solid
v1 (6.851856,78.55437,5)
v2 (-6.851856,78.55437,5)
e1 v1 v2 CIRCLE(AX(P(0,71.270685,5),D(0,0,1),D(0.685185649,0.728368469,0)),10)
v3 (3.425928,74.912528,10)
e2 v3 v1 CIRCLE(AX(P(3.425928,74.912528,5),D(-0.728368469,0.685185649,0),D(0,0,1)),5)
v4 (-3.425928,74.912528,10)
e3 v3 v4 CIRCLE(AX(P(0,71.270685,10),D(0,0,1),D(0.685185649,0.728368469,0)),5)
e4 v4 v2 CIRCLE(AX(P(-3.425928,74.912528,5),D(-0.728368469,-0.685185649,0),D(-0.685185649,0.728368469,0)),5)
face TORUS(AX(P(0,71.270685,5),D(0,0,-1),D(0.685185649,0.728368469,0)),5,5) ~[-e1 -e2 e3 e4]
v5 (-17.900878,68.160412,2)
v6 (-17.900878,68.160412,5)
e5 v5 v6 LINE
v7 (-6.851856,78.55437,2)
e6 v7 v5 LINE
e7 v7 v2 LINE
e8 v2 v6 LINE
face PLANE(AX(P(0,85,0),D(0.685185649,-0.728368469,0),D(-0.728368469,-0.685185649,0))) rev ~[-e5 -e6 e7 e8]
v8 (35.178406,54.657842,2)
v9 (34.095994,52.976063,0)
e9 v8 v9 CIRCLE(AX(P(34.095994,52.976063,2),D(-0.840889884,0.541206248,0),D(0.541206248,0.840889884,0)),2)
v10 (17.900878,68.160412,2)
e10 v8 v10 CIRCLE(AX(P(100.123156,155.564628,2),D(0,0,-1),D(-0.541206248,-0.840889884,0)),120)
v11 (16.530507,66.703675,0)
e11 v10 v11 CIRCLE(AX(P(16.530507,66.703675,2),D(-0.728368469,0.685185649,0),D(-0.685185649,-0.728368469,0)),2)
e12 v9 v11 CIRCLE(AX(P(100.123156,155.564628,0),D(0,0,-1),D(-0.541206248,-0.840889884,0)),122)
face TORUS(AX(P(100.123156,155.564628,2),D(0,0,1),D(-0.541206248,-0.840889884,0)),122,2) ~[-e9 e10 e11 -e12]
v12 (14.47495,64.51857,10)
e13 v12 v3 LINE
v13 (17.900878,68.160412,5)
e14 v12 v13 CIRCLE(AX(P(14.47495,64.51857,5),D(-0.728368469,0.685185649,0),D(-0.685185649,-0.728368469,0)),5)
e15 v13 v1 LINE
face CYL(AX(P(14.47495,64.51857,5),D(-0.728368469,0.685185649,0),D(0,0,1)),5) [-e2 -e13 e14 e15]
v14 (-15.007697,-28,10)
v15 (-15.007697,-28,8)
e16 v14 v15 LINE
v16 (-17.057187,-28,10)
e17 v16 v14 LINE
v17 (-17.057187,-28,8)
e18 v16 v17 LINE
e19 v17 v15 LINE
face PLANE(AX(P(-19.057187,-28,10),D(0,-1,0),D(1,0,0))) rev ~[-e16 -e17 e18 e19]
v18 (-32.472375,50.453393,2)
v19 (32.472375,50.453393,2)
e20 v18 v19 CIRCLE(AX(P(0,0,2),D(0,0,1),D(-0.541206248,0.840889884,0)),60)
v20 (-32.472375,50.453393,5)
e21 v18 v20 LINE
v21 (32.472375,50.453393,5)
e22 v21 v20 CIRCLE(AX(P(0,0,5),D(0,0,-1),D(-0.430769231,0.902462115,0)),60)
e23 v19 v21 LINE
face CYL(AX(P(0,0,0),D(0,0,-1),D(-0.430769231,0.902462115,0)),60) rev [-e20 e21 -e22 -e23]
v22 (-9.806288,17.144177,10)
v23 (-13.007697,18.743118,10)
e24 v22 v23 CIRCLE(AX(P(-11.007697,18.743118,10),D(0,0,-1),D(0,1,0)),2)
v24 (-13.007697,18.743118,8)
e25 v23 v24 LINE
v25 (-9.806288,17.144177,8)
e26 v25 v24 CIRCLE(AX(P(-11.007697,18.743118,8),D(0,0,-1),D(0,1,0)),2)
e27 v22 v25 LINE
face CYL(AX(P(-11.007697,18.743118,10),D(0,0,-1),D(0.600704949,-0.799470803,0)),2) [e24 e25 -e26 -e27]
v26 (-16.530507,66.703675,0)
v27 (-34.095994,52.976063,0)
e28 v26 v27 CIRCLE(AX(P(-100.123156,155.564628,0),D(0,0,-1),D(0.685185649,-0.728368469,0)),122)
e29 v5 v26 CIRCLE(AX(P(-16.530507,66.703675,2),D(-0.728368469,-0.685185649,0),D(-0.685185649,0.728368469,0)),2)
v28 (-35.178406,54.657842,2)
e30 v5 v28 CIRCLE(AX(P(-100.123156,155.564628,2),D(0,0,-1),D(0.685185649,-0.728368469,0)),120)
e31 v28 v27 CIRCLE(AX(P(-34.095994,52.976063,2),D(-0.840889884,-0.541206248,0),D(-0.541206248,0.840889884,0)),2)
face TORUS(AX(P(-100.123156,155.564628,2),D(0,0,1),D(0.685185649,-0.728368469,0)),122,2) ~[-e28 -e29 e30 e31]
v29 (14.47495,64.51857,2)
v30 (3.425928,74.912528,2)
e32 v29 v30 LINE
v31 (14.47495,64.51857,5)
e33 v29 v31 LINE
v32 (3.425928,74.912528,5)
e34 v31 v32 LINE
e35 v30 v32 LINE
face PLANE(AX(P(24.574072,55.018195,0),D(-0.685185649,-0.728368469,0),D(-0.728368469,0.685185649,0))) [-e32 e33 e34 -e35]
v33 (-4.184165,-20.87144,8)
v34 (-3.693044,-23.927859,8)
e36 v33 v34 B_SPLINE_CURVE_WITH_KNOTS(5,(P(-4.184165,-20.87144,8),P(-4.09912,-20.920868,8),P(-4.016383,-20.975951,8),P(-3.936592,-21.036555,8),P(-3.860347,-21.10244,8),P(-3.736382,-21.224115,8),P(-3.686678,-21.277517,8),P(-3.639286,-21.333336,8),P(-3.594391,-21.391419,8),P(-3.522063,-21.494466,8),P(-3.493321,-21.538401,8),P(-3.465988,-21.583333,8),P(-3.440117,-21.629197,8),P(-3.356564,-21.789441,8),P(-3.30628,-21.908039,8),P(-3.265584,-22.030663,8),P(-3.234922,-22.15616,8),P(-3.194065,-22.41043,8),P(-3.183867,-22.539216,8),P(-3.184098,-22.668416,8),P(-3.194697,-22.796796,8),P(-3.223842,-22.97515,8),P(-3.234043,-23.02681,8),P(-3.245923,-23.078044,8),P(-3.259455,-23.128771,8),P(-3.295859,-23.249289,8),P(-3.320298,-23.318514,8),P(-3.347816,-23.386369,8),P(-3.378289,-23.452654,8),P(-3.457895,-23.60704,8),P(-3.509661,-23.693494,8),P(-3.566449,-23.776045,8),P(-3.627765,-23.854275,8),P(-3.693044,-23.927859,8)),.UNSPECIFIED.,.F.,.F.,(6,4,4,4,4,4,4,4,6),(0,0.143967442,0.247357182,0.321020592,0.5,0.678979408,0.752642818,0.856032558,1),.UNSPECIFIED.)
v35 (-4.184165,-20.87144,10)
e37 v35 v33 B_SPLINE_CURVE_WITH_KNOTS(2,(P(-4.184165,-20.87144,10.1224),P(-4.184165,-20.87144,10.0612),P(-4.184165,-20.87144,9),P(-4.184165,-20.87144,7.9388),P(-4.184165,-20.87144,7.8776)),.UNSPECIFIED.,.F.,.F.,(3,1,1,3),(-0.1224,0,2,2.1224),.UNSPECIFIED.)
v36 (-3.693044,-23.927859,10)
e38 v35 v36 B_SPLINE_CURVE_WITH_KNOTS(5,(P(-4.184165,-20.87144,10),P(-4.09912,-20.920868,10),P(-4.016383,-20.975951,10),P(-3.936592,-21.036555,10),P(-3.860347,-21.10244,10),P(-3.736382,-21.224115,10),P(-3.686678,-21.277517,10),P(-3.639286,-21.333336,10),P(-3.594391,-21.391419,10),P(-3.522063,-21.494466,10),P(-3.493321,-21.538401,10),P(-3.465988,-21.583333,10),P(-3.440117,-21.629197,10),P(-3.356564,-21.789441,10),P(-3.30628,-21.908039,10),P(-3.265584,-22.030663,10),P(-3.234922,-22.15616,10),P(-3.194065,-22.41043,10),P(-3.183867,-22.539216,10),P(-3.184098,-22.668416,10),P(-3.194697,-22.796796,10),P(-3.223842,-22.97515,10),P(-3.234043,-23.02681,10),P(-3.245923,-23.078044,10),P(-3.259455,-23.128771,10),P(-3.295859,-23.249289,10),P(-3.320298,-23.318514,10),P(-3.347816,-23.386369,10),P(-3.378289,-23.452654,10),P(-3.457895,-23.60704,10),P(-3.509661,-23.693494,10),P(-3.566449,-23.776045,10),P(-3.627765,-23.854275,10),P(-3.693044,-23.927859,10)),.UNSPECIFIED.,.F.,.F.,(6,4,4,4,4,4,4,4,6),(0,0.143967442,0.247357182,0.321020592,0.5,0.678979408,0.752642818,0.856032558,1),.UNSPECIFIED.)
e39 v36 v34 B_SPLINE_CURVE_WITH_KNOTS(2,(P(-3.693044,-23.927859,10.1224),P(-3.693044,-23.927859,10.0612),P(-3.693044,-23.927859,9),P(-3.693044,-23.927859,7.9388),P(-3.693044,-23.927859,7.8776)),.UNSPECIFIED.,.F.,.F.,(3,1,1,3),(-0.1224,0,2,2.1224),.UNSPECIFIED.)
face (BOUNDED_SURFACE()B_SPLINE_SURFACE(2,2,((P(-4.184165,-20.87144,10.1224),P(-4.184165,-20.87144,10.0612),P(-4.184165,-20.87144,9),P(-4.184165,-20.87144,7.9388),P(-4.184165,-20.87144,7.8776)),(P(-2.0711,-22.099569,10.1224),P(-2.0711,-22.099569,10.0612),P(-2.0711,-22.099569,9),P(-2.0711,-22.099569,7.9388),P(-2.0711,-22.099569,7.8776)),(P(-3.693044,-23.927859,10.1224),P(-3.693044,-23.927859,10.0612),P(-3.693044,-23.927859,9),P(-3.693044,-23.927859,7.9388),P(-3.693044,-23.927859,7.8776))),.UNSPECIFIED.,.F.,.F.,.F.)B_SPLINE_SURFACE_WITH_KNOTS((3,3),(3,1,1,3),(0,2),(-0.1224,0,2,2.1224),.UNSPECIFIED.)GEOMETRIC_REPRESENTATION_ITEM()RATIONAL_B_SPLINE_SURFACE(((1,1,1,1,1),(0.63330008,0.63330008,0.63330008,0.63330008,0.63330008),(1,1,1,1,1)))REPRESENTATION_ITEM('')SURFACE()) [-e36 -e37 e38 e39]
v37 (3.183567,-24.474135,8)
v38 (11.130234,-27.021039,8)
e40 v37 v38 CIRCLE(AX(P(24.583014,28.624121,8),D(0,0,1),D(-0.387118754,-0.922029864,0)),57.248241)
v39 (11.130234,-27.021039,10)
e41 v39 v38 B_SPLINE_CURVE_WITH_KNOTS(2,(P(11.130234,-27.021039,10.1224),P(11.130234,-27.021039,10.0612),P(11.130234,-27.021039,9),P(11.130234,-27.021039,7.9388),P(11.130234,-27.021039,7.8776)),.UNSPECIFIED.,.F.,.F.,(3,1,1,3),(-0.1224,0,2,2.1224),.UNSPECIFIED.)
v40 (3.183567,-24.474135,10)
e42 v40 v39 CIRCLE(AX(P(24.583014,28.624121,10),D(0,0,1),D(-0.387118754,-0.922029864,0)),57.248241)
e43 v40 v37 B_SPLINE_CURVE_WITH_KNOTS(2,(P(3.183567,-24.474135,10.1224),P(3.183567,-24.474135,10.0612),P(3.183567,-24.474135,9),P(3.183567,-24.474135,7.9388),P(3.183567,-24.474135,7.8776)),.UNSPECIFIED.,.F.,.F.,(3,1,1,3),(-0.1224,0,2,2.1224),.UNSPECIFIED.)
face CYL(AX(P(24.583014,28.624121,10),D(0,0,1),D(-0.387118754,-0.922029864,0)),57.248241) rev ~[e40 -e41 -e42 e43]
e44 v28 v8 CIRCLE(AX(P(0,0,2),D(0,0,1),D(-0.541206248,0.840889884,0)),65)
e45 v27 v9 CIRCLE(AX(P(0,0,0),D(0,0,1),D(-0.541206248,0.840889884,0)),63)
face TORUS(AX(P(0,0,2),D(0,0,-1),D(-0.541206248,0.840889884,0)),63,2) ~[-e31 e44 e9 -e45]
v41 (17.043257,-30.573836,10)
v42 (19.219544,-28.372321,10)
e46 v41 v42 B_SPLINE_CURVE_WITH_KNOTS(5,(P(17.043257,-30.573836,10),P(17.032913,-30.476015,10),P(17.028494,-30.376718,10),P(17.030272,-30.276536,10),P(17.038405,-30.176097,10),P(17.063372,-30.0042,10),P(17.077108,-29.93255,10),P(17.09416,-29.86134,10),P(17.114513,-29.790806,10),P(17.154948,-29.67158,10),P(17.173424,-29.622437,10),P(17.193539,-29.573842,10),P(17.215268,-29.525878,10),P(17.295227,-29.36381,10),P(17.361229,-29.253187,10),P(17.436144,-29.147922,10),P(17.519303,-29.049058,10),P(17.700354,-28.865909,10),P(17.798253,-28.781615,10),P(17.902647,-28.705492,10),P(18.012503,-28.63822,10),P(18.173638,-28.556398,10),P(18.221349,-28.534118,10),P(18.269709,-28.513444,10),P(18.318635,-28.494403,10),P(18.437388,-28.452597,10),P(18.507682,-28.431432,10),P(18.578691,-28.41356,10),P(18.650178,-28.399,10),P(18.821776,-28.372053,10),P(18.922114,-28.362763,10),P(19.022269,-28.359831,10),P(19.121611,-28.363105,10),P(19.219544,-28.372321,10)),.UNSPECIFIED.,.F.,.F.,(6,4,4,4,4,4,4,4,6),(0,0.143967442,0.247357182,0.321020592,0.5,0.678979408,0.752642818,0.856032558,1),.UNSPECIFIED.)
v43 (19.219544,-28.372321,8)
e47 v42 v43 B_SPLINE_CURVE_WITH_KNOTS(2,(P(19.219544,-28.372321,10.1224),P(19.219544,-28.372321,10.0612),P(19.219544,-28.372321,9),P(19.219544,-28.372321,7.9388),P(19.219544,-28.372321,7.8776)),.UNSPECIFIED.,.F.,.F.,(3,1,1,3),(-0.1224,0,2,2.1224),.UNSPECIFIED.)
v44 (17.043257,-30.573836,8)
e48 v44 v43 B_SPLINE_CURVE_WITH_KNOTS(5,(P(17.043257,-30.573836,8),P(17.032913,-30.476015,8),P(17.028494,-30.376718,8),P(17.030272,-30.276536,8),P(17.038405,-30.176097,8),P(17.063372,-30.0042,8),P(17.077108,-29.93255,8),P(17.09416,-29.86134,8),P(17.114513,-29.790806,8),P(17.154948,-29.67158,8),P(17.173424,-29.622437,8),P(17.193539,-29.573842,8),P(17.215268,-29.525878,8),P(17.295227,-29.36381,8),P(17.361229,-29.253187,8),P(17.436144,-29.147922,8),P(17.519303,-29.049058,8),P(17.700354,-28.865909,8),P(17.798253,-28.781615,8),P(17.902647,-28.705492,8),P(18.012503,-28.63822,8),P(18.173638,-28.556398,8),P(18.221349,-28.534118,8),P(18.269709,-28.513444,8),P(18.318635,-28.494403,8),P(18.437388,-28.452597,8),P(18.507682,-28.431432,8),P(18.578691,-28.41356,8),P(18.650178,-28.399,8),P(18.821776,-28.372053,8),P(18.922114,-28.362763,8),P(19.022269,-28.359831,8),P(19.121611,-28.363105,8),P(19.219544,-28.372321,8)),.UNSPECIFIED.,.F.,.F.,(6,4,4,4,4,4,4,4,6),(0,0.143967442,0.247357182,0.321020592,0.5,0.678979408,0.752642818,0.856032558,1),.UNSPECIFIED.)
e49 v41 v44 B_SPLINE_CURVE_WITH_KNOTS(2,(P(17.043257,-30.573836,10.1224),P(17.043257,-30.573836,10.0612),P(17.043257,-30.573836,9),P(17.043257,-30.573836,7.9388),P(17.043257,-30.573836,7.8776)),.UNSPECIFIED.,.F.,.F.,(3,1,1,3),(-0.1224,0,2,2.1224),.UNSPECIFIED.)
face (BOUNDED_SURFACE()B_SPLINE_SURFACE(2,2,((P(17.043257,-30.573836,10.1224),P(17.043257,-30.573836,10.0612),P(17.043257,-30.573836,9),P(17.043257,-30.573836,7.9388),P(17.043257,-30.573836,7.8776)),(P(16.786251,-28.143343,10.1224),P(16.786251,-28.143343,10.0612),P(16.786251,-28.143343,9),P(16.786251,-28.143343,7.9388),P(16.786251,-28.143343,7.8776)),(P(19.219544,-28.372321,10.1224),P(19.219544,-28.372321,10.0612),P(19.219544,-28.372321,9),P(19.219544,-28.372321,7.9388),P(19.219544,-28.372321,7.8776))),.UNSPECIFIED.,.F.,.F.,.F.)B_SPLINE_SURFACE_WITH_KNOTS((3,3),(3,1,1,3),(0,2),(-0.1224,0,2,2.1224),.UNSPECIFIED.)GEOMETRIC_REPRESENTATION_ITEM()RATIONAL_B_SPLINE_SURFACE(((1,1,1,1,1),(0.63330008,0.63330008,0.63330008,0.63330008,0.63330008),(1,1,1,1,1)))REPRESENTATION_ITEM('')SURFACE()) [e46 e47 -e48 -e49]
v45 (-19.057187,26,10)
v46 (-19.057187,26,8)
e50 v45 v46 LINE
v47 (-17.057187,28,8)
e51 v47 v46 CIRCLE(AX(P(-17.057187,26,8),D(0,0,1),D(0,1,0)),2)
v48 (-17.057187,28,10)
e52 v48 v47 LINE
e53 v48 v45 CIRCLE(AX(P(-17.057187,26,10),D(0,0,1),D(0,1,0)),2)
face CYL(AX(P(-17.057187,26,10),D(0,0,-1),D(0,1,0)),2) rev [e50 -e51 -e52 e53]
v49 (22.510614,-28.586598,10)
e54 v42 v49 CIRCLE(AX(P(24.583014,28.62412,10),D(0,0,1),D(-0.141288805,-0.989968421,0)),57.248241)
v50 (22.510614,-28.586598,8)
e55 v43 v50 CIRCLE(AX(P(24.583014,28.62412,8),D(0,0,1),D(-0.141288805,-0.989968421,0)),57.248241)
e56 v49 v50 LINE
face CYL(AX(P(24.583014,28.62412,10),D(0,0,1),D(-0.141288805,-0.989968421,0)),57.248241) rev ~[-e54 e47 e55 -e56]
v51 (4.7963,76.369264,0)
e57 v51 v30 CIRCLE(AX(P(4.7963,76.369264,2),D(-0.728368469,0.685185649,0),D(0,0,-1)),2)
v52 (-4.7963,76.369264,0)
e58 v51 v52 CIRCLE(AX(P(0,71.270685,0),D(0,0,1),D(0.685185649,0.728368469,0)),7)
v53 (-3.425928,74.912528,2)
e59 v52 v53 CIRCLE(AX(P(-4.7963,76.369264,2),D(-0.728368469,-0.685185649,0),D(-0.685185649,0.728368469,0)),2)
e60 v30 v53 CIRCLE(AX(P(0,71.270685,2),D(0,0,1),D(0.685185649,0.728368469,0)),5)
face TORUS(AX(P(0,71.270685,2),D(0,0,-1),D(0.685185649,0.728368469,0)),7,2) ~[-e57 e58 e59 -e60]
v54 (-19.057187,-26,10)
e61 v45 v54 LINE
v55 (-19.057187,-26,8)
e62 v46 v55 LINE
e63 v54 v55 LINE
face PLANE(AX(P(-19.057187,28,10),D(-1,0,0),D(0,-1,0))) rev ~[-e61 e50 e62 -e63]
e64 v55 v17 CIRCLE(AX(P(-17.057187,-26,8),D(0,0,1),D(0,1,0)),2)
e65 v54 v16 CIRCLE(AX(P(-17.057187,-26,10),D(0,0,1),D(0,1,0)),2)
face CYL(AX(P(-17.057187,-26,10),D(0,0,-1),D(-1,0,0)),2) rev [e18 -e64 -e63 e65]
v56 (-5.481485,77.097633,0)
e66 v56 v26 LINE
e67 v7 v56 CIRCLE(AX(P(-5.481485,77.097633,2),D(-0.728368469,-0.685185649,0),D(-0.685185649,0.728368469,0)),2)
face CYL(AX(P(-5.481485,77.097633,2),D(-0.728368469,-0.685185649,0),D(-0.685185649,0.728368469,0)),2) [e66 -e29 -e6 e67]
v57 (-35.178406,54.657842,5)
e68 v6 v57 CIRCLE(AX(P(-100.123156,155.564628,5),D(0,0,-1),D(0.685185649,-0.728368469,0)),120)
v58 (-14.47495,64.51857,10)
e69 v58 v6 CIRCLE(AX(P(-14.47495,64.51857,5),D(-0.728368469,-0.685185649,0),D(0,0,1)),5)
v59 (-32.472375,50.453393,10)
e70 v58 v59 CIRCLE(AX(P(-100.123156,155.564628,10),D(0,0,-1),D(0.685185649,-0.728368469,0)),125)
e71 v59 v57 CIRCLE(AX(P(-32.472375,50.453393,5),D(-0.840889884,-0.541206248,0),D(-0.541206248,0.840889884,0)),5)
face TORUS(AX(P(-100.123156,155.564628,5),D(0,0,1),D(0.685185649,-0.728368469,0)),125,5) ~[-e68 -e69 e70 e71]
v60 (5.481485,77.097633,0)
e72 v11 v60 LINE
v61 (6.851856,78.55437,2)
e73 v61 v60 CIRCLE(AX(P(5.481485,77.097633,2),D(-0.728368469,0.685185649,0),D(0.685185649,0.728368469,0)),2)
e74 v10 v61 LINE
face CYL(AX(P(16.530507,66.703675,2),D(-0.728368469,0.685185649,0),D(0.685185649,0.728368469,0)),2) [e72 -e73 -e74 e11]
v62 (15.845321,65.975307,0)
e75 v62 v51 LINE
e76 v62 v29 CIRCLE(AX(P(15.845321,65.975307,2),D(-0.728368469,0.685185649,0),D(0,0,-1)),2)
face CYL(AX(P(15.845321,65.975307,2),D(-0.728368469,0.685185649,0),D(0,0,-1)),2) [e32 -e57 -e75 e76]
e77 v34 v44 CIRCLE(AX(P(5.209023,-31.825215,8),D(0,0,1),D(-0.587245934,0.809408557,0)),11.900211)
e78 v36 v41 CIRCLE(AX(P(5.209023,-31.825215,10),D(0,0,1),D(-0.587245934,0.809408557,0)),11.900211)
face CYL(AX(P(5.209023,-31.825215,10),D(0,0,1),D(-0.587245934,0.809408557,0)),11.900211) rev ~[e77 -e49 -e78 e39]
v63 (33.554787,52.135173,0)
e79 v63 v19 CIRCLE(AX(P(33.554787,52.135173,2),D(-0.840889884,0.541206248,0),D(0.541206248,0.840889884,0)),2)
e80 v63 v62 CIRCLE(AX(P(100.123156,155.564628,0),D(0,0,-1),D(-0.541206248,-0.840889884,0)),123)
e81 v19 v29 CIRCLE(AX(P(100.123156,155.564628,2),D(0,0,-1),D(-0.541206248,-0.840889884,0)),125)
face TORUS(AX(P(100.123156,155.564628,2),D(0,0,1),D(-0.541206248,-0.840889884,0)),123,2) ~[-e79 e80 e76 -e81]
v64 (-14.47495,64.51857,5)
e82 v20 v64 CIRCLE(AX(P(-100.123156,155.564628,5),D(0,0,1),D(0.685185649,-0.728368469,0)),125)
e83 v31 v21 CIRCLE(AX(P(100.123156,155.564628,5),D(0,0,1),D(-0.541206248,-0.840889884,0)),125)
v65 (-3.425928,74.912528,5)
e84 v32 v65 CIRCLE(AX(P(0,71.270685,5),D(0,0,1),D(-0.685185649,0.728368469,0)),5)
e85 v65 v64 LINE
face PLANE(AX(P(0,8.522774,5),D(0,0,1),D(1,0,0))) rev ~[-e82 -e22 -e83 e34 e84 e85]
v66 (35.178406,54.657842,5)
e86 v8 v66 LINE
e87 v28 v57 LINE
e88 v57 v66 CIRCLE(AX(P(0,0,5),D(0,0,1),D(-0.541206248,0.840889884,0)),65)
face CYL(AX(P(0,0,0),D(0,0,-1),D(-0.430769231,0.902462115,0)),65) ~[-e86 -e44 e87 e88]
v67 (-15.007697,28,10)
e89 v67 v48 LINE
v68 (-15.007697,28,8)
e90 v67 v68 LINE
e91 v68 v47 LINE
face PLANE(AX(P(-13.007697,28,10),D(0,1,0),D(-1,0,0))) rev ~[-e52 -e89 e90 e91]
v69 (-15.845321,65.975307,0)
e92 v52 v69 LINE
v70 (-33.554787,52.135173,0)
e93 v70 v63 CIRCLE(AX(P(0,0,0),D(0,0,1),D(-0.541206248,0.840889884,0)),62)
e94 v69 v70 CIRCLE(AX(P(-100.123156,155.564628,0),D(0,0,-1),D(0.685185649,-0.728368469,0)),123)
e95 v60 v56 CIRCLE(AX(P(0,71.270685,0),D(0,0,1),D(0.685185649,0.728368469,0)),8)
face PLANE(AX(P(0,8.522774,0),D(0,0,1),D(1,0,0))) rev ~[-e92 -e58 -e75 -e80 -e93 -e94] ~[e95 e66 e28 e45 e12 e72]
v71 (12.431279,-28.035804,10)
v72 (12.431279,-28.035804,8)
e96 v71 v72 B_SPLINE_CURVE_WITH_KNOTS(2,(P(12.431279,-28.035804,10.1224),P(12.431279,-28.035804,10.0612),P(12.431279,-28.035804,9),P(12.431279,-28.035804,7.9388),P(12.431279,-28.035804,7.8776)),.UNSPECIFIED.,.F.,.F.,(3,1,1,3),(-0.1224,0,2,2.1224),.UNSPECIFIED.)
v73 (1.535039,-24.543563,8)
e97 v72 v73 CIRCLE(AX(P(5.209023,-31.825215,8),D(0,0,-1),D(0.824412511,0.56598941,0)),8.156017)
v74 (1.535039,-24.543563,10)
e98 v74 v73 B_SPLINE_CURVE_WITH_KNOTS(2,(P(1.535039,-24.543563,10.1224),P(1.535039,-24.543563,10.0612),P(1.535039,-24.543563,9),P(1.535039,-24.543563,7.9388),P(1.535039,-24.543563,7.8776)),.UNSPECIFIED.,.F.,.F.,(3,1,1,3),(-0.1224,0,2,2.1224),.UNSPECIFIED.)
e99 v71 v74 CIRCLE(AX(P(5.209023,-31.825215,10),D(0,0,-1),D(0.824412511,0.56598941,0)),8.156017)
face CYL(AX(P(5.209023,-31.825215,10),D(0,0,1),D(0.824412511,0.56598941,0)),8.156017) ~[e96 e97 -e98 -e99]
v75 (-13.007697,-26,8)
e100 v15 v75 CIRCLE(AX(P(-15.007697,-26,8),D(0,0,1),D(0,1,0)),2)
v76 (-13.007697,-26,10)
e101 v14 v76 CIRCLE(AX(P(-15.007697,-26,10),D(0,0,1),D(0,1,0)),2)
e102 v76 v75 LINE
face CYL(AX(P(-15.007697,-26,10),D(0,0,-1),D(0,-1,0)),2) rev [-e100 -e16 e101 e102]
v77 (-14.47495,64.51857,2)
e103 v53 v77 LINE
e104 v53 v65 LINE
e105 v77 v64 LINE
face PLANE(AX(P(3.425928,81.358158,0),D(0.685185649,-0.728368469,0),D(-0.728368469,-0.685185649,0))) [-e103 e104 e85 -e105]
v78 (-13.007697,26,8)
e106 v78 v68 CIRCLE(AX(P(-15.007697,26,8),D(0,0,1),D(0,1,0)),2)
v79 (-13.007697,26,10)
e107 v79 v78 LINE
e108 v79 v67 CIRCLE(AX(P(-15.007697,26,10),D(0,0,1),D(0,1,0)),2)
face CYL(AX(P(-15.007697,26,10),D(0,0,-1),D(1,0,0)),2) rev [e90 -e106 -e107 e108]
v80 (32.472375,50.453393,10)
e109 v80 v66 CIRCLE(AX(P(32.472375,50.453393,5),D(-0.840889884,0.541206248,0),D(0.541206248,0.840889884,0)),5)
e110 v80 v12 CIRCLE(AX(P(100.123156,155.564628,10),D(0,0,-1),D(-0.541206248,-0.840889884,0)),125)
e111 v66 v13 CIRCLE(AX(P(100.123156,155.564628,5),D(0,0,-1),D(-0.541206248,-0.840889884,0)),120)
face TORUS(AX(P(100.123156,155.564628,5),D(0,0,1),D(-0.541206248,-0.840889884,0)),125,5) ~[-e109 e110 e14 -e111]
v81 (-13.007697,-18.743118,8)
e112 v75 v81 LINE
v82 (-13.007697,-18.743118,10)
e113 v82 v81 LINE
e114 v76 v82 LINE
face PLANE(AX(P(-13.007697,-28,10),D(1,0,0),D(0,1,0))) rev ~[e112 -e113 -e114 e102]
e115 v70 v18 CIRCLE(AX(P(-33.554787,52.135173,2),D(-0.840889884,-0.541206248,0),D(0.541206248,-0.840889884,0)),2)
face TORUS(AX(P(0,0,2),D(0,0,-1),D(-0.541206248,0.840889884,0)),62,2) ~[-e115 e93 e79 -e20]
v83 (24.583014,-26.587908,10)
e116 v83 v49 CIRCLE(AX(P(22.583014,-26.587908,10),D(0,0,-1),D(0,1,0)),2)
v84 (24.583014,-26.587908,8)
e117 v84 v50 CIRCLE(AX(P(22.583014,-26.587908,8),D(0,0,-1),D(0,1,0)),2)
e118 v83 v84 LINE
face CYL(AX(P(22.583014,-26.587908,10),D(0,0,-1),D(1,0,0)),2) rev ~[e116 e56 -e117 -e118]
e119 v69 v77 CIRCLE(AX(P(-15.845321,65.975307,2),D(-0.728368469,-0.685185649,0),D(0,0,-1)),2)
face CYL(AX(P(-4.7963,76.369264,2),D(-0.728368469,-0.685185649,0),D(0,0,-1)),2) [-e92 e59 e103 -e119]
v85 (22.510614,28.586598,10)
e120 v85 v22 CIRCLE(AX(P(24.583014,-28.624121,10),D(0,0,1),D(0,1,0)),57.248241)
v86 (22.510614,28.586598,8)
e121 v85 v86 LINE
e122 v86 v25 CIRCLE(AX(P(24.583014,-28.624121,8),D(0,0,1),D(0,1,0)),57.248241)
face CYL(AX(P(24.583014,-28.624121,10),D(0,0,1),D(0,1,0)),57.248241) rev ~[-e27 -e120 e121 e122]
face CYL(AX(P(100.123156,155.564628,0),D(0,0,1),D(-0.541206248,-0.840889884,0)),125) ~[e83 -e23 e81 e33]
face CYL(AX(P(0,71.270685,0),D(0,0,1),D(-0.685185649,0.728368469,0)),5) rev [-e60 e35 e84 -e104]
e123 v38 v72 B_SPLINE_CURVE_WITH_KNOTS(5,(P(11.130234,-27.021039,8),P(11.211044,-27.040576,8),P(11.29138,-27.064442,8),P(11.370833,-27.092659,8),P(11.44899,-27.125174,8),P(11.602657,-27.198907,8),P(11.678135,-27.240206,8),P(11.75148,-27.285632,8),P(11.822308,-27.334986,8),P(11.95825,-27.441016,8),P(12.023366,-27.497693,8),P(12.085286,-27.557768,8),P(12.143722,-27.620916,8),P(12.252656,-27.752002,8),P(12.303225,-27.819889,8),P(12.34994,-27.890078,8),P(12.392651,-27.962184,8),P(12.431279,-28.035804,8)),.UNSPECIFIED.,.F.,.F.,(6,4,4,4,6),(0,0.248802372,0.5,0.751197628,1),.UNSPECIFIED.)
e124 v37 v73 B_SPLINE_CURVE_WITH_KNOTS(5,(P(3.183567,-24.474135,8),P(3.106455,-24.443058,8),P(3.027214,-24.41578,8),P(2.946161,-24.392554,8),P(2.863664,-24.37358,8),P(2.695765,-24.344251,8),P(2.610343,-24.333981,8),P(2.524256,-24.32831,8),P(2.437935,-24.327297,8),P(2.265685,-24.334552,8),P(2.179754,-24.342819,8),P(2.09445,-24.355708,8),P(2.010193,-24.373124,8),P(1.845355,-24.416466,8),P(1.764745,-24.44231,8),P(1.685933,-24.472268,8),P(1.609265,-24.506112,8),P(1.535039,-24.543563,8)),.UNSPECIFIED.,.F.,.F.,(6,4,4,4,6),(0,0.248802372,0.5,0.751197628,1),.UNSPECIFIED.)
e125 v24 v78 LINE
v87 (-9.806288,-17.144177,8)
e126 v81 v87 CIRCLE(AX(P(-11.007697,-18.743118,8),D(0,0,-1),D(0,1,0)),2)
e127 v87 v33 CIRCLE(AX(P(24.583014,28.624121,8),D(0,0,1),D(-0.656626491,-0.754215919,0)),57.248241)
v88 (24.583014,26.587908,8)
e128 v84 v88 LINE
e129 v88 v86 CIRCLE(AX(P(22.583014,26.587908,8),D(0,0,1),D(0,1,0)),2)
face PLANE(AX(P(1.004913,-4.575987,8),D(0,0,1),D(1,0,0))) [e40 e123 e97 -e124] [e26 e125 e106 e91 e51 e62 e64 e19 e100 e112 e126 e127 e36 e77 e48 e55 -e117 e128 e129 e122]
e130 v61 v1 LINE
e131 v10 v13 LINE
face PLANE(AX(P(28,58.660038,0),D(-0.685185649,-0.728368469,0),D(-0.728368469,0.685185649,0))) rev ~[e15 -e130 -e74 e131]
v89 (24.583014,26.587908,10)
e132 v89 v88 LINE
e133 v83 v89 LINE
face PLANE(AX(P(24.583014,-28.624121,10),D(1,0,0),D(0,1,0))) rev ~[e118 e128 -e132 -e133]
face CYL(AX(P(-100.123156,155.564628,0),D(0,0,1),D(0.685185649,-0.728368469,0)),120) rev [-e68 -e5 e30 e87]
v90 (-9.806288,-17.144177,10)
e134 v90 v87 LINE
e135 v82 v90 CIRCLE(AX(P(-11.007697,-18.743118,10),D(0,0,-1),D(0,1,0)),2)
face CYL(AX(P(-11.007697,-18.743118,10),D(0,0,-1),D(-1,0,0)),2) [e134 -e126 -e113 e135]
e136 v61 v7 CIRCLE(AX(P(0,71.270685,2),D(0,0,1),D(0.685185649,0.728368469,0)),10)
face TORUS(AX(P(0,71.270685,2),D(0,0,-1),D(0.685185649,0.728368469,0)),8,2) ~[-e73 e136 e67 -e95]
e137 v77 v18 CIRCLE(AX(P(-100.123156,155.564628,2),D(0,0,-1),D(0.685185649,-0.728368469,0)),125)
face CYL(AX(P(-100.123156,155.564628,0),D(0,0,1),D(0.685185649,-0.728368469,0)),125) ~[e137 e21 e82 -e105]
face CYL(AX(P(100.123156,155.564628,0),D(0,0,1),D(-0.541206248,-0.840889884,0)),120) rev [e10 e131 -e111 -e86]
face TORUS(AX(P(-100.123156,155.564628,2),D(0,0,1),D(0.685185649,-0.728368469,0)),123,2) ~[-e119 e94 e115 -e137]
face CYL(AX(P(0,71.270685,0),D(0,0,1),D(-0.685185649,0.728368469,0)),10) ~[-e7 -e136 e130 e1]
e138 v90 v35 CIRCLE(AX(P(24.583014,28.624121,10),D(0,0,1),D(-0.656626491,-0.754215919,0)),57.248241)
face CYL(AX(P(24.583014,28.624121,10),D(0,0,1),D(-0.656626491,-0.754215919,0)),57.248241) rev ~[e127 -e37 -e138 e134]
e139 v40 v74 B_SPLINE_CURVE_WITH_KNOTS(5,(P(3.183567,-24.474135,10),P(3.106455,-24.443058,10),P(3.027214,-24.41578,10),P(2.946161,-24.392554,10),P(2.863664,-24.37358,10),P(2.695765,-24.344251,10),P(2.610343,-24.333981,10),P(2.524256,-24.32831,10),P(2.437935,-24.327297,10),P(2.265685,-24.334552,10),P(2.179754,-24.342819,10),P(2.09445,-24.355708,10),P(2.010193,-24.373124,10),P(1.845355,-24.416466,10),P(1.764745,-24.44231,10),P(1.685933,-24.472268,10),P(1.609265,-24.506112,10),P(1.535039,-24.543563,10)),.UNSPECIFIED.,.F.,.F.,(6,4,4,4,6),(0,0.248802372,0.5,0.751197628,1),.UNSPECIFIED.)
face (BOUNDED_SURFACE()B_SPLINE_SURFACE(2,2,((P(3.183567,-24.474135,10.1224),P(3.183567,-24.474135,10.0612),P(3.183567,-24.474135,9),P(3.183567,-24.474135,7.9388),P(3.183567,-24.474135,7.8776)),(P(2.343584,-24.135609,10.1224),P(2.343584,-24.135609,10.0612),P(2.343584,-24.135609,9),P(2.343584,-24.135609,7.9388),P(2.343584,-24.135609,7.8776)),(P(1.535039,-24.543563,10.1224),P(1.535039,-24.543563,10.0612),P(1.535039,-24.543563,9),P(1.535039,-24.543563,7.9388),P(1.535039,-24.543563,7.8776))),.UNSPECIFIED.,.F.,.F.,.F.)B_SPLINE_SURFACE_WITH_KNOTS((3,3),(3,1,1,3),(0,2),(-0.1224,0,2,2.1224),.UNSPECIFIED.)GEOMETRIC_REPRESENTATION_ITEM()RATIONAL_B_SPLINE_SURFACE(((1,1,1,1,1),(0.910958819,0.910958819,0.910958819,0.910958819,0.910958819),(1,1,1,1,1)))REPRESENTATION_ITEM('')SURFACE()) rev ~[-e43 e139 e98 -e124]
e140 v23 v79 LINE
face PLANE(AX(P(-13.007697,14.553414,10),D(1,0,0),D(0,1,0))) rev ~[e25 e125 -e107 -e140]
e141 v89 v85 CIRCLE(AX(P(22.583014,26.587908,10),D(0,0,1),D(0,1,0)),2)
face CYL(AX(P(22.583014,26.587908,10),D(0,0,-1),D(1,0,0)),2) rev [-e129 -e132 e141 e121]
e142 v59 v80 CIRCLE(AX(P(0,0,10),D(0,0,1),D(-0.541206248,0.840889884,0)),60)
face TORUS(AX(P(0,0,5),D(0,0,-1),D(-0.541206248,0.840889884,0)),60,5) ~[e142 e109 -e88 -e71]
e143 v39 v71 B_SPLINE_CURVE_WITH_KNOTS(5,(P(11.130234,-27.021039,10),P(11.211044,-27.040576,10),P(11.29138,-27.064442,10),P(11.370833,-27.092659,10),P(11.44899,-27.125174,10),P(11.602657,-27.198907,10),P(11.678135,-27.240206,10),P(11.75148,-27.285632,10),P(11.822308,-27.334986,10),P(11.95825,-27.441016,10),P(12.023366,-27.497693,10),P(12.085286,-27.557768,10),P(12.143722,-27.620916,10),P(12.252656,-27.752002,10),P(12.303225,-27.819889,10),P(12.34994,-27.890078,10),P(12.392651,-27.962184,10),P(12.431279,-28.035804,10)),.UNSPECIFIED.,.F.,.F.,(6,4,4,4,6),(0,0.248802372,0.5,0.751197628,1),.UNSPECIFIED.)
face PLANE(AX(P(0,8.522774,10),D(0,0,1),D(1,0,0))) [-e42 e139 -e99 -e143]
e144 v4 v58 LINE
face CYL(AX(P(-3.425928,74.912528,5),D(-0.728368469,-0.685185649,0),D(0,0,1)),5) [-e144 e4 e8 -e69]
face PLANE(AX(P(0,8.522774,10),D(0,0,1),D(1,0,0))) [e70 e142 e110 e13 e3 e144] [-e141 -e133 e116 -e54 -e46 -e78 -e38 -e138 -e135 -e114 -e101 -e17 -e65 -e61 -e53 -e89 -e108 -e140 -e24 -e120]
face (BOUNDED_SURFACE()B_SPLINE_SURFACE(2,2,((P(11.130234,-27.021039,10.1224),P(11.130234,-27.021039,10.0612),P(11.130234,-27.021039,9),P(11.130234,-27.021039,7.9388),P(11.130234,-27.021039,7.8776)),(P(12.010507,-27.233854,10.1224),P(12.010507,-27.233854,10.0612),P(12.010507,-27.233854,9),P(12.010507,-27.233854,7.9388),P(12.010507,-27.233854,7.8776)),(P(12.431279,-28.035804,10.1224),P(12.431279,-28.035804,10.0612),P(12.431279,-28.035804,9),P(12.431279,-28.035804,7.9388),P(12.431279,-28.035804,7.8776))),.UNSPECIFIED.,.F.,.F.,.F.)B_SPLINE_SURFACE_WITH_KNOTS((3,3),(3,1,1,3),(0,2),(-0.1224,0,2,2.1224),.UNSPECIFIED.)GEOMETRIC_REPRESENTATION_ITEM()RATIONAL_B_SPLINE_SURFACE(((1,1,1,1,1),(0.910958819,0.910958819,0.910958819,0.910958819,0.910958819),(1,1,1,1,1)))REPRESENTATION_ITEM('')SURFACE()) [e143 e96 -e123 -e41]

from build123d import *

# Parameters (mm, degrees)
F1_DEPTH = 10
F2_R     = 10
F3_R     = 120
F4_T     = -5
F5_R     = 5
F7_DEPTH = 2
F8_R     = 2
F9_R     = 2


with BuildPart() as f1:
    # F0 (on Top) → F1 (new body)
    with BuildSketch(Plane.XY):
        with BuildLine():
            Line((0, 85), (-28, 58.6600375042))
            ThreePointArc((-28, 58.6600375042), (0, -65), (28, 58.6600375042))
            Line((28, 58.6600375042), (0, 85))
        make_face()
    extrude(amount=F1_DEPTH)

    # F2
    f2_edges = [f1.edges().sort_by_distance(p)[0] for p in [
        (0, 85, 5),
    ]]
    fillet(f2_edges, radius=F2_R)

    # F3
    f3_edges = [f1.edges().sort_by_distance(p)[0] for p in [
        (-28, 58.660038, 5),
        (28, 58.660038, 5),
    ]]
    fillet(f3_edges, radius=F3_R)

    # F4
    f4_openings = [f1.faces().sort_by_distance(p)[0] for p in [
        (0, 2.490227, 0),
    ]]
    offset(amount=F4_T, openings=f4_openings)

    # F5
    f5_edges = [f1.edges().sort_by_distance(p)[0] for p in [
        (0, -65, 10),
        (12.376367, 73.357391, 10),
        (26.230576, 61.013655, 10),
        (0, 81.270685, 10),
        (-12.376367, 73.357391, 10),
        (-26.230576, 61.013655, 10),
    ]]
    fillet(f5_edges, radius=F5_R)

    # F6 (on face) → F7 (cut)
    with BuildSketch(Plane.XY.offset(10)):
        with BuildLine():
            Line((24.5830141958, -28.6241205137), (24.5830141958, 28.6241205137))
            ThreePointArc((24.5830141958, 28.6241205137), (4.5140931022, 24.9911712124), (-13.0076974051, 14.5534141782))
            Line((-13.0076974051, 14.5534141782), (-13.0076974051, 28))
            Line((-13.0076974051, 28), (-19.0571866046, 28))
            Line((-19.0571866046, 28), (-19.0571866046, -28))
            Line((-19.0571866046, -28), (-13.0076974051, -28))
            Line((-13.0076974051, -28), (-13.0076974051, -14.5534141782))
            ThreePointArc((-13.0076974051, -14.5534141782), (-7.6208581173, -18.7073881119), (-1.7793276831, -22.1930816072))
            ThreePointArc((-1.7793276831, -22.1930816072), (1.5769915618, -43.1576186172), (16.4944786534, -28.0498302354))
            ThreePointArc((16.4944786534, -28.0498302354), (20.5285655112, -28.4803674588), (24.5830141958, -28.6241205137))
        make_face()
        with BuildLine():
            ThreePointArc((11.9329452437, -27.2089956114), (2.7197472284, -39.5920744788), (2.4211464703, -24.1604673852))
            ThreePointArc((2.4211464703, -24.1604673852), (7.1104323918, -25.8925740471), (11.9329452437, -27.2089956114))
        make_face(mode=Mode.SUBTRACT)
    extrude(amount=-F7_DEPTH, mode=Mode.SUBTRACT)

    # F8
    f8_edges = [f1.edges().sort_by_distance(p)[0] for p in [
        (-13.007697, 28, 9),
        (-19.057187, 28, 9),
        (-13.007697, 14.553414, 9),
        (24.583014, 28.624121, 9),
        (24.583014, -28.624121, 9),
        (16.494479, -28.04983, 9),
        (-1.779328, -22.193082, 9),
        (2.421146, -24.160467, 9),
        (11.932945, -27.208996, 9),
        (-13.007697, -14.553414, 9),
        (-13.007697, -28, 9),
        (-19.057187, -28, 9),
    ]]
    fillet(f8_edges, radius=F8_R)

    # F9
    f9_edges = [f1.edges().sort_by_distance(p)[0] for p in [
        (0, -65, 0),
        (-26.230576, 61.013655, 0),
        (26.230576, 61.013655, 0),
        (-12.376367, 73.357391, 0),
        (12.376367, 73.357391, 0),
        (0, 81.270685, 0),
        (8.950439, 69.715549, 0),
        (23.151719, 57.074031, 0),
        (0, -60, 0),
        (-23.151719, 57.074031, 0),
        (-8.950439, 69.715549, 0),
        (0, 76.270685, 0),
    ]]
    fillet(f9_edges, radius=F9_R)


solid = f1.part
